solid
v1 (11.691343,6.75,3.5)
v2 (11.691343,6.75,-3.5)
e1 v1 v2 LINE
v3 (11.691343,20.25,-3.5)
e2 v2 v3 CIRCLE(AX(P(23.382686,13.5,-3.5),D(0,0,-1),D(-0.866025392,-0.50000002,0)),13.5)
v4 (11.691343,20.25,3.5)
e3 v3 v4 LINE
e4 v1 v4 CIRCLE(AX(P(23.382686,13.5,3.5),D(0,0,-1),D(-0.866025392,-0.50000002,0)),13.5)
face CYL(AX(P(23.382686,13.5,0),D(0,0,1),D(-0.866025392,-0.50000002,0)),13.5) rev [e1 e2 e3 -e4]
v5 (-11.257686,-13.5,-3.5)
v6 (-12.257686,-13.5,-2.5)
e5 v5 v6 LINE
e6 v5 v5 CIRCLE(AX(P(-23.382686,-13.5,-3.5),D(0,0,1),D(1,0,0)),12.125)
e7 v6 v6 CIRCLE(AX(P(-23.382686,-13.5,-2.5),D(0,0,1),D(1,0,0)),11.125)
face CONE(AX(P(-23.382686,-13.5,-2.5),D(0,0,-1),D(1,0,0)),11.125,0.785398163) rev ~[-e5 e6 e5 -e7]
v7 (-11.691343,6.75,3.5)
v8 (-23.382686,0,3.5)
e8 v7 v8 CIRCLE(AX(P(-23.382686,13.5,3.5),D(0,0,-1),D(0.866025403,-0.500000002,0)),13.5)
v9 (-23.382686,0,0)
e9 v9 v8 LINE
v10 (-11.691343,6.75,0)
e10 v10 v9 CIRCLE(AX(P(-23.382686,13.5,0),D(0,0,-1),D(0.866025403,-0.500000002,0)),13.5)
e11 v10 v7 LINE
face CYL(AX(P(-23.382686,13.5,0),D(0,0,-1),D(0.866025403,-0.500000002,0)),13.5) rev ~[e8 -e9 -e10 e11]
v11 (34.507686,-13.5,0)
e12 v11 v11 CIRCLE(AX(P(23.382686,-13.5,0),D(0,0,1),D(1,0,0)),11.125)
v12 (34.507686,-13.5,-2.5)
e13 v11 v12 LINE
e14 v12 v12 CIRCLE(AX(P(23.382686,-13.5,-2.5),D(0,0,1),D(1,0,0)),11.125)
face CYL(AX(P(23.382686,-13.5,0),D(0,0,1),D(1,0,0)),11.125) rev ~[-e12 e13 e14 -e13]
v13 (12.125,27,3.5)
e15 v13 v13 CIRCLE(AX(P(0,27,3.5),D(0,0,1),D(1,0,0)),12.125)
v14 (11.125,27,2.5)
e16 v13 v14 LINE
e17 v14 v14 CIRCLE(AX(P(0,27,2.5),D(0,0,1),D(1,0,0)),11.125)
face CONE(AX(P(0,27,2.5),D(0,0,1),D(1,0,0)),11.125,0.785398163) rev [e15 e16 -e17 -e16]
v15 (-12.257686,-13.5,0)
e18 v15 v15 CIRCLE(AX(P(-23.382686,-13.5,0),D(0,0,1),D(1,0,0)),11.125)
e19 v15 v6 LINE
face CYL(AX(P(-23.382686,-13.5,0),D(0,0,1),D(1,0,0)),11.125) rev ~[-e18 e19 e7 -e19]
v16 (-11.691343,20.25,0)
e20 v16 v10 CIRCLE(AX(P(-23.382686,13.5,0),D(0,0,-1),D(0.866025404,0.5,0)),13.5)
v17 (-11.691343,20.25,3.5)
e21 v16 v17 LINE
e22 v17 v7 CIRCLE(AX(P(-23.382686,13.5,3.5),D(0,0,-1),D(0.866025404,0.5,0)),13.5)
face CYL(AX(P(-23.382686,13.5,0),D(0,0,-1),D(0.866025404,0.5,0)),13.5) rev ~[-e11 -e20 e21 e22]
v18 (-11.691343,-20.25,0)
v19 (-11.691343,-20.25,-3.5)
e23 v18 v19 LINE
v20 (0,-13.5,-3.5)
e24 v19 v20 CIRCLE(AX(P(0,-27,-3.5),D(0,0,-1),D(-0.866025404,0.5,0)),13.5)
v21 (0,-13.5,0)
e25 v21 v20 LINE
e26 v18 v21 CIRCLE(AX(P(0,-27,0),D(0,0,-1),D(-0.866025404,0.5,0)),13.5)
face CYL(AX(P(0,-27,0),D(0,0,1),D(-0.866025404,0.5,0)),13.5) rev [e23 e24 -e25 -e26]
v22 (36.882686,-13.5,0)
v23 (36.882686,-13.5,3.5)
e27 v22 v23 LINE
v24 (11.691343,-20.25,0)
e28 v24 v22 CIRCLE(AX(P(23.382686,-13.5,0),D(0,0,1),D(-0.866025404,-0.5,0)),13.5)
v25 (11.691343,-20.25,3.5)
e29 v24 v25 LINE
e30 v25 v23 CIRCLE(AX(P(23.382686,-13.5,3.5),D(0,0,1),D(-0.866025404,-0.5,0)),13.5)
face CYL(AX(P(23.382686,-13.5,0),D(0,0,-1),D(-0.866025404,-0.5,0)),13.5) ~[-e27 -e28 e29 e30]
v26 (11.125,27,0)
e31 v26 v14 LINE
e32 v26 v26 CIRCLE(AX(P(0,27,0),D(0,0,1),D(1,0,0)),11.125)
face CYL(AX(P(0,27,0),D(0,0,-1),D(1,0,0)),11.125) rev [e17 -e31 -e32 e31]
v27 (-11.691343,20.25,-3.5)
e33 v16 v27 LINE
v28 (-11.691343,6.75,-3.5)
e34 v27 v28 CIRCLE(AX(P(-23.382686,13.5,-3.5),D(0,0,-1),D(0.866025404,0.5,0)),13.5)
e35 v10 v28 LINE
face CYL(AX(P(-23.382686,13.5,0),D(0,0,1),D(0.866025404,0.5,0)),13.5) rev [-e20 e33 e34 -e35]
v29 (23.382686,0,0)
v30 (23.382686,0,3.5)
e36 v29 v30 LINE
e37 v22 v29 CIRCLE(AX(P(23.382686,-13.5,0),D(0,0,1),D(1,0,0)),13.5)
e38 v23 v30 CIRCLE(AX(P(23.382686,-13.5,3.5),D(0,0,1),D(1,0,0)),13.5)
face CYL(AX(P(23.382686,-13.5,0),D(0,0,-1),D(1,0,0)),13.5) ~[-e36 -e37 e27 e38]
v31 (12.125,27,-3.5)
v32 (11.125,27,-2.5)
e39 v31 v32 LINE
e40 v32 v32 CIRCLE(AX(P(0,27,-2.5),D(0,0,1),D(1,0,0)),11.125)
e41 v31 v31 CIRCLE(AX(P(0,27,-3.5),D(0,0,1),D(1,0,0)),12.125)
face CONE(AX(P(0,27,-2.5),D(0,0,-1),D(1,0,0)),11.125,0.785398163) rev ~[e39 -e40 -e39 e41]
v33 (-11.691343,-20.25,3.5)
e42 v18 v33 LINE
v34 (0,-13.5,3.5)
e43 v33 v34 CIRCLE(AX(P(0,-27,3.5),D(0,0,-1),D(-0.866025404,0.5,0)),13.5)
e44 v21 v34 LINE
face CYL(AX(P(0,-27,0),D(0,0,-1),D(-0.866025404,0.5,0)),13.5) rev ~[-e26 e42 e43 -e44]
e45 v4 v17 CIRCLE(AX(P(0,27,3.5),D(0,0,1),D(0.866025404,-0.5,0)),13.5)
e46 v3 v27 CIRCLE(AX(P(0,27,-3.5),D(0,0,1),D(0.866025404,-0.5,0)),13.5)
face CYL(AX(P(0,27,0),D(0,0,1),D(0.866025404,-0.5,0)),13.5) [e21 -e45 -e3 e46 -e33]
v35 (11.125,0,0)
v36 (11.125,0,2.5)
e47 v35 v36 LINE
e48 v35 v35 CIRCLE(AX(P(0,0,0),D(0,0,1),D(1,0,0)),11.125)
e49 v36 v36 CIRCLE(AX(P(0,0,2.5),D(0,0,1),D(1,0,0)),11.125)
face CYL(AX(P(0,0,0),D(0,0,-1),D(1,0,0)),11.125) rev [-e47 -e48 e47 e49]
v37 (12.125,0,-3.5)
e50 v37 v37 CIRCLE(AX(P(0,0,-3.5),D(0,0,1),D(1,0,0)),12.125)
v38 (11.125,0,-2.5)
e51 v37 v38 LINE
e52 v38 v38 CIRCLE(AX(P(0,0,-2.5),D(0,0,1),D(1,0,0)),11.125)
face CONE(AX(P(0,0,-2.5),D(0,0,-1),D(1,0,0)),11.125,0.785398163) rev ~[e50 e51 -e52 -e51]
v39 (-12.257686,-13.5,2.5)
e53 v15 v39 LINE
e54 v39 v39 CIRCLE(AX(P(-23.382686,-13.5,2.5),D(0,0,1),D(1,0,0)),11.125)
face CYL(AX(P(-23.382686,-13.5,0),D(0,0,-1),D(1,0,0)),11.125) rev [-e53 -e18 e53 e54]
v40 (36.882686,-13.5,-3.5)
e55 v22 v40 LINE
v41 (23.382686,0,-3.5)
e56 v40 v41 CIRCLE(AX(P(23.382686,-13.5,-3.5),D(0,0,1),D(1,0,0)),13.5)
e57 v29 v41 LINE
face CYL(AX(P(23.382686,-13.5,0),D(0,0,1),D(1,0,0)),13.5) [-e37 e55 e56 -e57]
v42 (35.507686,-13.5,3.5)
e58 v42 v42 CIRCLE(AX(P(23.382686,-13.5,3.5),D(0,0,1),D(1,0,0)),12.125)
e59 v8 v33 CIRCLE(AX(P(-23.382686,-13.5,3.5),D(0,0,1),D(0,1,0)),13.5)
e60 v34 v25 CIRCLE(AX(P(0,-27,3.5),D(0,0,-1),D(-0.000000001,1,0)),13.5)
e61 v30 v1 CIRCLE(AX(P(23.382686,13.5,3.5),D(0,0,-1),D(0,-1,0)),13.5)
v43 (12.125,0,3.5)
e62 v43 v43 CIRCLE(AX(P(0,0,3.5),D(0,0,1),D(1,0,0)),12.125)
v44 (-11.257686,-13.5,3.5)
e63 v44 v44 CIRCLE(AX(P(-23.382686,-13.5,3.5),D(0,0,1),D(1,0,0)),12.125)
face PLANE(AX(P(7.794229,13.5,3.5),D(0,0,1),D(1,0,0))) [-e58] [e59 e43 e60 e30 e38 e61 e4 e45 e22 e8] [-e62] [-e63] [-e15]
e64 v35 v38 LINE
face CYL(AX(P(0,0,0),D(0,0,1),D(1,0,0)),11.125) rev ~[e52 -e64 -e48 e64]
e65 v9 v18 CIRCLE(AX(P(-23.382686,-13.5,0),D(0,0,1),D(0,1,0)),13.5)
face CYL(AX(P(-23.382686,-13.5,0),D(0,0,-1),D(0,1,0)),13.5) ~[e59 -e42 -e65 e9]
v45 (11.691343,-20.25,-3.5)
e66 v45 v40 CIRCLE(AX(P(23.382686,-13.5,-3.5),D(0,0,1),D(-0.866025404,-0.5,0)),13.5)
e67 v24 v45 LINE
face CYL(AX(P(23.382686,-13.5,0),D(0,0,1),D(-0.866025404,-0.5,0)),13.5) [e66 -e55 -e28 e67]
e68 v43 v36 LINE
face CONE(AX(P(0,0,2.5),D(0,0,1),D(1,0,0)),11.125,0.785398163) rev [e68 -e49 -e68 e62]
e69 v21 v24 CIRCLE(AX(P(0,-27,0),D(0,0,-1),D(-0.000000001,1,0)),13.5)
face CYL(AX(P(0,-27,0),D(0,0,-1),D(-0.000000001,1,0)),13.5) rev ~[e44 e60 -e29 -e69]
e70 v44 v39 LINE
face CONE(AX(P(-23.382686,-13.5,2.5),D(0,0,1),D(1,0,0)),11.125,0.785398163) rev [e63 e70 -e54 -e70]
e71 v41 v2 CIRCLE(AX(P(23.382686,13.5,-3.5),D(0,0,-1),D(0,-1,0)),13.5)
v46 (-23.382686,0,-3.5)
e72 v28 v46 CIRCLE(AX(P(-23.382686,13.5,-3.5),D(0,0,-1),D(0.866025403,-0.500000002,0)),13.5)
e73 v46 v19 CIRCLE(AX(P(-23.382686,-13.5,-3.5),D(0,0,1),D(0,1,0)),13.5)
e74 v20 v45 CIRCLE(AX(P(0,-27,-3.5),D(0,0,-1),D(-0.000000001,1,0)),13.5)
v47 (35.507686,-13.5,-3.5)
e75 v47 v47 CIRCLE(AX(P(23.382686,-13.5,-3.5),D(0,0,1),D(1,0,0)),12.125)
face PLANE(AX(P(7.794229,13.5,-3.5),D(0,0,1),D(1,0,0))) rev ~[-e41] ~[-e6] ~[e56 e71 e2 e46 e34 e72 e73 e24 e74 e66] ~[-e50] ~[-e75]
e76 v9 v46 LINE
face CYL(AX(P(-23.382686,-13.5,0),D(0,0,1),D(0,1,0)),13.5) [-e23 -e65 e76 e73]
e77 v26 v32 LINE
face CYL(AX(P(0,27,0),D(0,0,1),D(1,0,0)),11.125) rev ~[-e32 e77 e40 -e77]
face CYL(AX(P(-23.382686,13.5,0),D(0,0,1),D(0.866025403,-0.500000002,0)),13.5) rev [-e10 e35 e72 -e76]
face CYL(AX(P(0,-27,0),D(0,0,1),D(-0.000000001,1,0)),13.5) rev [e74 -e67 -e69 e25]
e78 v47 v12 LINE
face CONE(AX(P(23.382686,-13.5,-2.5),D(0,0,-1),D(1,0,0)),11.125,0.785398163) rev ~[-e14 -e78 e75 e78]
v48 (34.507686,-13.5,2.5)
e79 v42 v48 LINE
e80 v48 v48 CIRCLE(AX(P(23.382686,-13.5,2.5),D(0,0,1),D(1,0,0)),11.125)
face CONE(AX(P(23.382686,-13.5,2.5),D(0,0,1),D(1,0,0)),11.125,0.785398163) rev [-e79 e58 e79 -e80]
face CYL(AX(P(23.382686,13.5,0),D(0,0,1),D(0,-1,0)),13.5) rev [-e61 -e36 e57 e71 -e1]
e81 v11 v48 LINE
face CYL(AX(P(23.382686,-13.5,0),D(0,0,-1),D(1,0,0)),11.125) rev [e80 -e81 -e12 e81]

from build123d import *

# Parameters (mm, degrees)
F0_R     = 11.125
F1_DEPTH = 3.5
F2_SIZE  = 1
F3_SIZE  = 1


# Not quite as in the source:
# - a feature names something its author has since deleted; it is built from what else it names


with BuildPart() as f1:
    # F0 (on Top) → F1 (new body, symmetric)
    with BuildSketch(Plane.XY):
        with BuildLine():
            ThreePointArc((-1.36e-08, 13.5), (6.7500001307, 11.6913428757), (11.6913431087, 6.7499997269))
            ThreePointArc((11.6913431087, 6.7499997269), (9.8826859022, 13.4999998423), (11.6913429511, 20.25))
            ThreePointArc((11.6913429511, 20.25), (6.7499999941, 15.3086570455), (-1.36e-08, 13.5))
        make_face()
        with BuildLine():
            ThreePointArc((-11.691342964, 6.7499999776), (-6.7500000171, 11.6913429412), (-1.36e-08, 13.5))
            ThreePointArc((-1.36e-08, 13.5), (-6.7500000059, 15.3086570523), (-11.6913429511, 20.25))
            ThreePointArc((-11.6913429511, 20.25), (-9.8826859022, 13.4999999871), (-11.691342964, 6.7499999776))
        make_face()
        with BuildLine():
            ThreePointArc((-11.6913429875, -6.749999937), (-13.5, 2.34e-08), (-11.691342964, 6.7499999776))
            ThreePointArc((-11.691342964, 6.7499999776), (-16.6326859134, 1.8086570424), (-23.3826859022, 0))
            ThreePointArc((-23.3826859022, 0), (-16.6326859337, -1.8086570307), (-11.6913429875, -6.749999937))
        make_face()
        with BuildLine():
            ThreePointArc((-11.6913429511, -20.25), (-6.7500000035, -15.3086570509), (-8.1e-09, -13.5))
            ThreePointArc((-8.1e-09, -13.5), (-6.750000035, -11.6913429309), (-11.6913429875, -6.749999937))
            ThreePointArc((-11.6913429875, -6.749999937), (-10.3426872567, -10.005942856), (-9.8826859022, -13.5))
            ThreePointArc((-9.8826859022, -13.5), (-10.3426872473, -16.9940571089), (-11.6913429511, -20.25))
        make_face()
        with BuildLine():
            ThreePointArc((11.6913429511, -20.25), (9.8826859022, -13.5000001869), (11.6913427641, -6.7500003238))
            ThreePointArc((11.6913427641, -6.7500003238), (6.7499998346, -11.6913430466), (-8.1e-09, -13.5))
            ThreePointArc((-8.1e-09, -13.5), (6.7499999965, -15.3086570469), (11.6913429511, -20.25))
        make_face()
        with BuildLine():
            ThreePointArc((11.6913431087, 6.7499997269), (13.0399986957, 3.4940569566), (13.5, 0))
            ThreePointArc((13.5, 0), (13.0399986065, -3.4940572895), (11.6913427641, -6.7500003238))
            ThreePointArc((11.6913427641, -6.7500003238), (16.6326857403, -1.8086571424), (23.3826859022, 0))
            ThreePointArc((23.3826859022, 0), (16.6326860387, 1.8086569701), (11.6913431087, 6.7499997269))
        make_face()
        with BuildLine():
            ThreePointArc((11.6913427641, -6.7500003238), (13.0399986065, -3.4940572895), (13.5, 0))
            ThreePointArc((13.5, 0), (13.0399986957, 3.4940569566), (11.6913431087, 6.7499997269))
            ThreePointArc((11.6913431087, 6.7499997269), (6.7500001307, 11.6913428757), (-1.36e-08, 13.5))
            ThreePointArc((-1.36e-08, 13.5), (-6.7500000171, 11.6913429412), (-11.691342964, 6.7499999776))
            ThreePointArc((-11.691342964, 6.7499999776), (-13.5, 2.34e-08), (-11.6913429875, -6.749999937))
            ThreePointArc((-11.6913429875, -6.749999937), (-6.750000035, -11.6913429309), (-8.1e-09, -13.5))
            ThreePointArc((-8.1e-09, -13.5), (6.7499998346, -11.6913430466), (11.6913427641, -6.7500003238))
        make_face()
        Circle(F0_R, mode=Mode.SUBTRACT)
        with BuildLine():
            ThreePointArc((-11.6913429511, 20.25), (-6.7500000059, 15.3086570523), (-1.36e-08, 13.5))
            ThreePointArc((-1.36e-08, 13.5), (6.7499999941, 15.3086570455), (11.6913429511, 20.25))
            ThreePointArc((11.6913429511, 20.25), (13.0399986549, 23.5059428911), (13.5, 27))
            ThreePointArc((13.5, 27), (-3.4940571089, 40.0399986549), (-11.6913429511, 20.25))
        make_face()
        with Locations((0, 27)):
            Circle(F0_R, mode=Mode.SUBTRACT)
        with BuildLine():
            ThreePointArc((-9.8826859022, -13.5), (-10.3426872567, -10.005942856), (-11.6913429875, -6.749999937))
            ThreePointArc((-11.6913429875, -6.749999937), (-16.6326859337, -1.8086570307), (-23.3826859022, 0))
            ThreePointArc((-23.3826859022, 0), (-35.0740288533, -20.25), (-11.6913429511, -20.25))
            ThreePointArc((-11.6913429511, -20.25), (-10.3426872473, -16.9940571089), (-9.8826859022, -13.5))
        make_face()
        with Locations((-23.3826859022, -13.5)):
            Circle(F0_R, mode=Mode.SUBTRACT)
        with BuildLine():
            ThreePointArc((23.3826859022, 0), (16.6326857403, -1.8086571424), (11.6913427641, -6.7500003238))
            ThreePointArc((11.6913427641, -6.7500003238), (9.8826859022, -13.5000001869), (11.6913429511, -20.25))
            ThreePointArc((11.6913429511, -20.25), (26.8767430111, -26.5399986549), (36.8826859022, -13.5))
            ThreePointArc((36.8826859022, -13.5), (32.9286274482, -3.954058454), (23.3826859022, 0))
        make_face()
        with Locations((23.3826859022, -13.5)):
            Circle(F0_R, mode=Mode.SUBTRACT)
    extrude(amount=F1_DEPTH, both=True)

    # F2
    f2_edges = [f1.edges().sort_by_distance(p)[0] for p in [
        (-11.125, 0, 3.5),
        (-11.125, 27, 3.5),
        (-34.507686, -13.5, 3.5),
        (12.257686, -13.5, 3.5),
    ]]
    chamfer(f2_edges, length=F2_SIZE)

    # F3
    f3_edges = [f1.edges().sort_by_distance(p)[0] for p in [
        (-11.125, 0, -3.5),
        (-11.125, 27, -3.5),
        (-34.507686, -13.5, -3.5),
        (12.257686, -13.5, -3.5),
    ]]
    chamfer(f3_edges, length=F3_SIZE)


solid = f1.part
